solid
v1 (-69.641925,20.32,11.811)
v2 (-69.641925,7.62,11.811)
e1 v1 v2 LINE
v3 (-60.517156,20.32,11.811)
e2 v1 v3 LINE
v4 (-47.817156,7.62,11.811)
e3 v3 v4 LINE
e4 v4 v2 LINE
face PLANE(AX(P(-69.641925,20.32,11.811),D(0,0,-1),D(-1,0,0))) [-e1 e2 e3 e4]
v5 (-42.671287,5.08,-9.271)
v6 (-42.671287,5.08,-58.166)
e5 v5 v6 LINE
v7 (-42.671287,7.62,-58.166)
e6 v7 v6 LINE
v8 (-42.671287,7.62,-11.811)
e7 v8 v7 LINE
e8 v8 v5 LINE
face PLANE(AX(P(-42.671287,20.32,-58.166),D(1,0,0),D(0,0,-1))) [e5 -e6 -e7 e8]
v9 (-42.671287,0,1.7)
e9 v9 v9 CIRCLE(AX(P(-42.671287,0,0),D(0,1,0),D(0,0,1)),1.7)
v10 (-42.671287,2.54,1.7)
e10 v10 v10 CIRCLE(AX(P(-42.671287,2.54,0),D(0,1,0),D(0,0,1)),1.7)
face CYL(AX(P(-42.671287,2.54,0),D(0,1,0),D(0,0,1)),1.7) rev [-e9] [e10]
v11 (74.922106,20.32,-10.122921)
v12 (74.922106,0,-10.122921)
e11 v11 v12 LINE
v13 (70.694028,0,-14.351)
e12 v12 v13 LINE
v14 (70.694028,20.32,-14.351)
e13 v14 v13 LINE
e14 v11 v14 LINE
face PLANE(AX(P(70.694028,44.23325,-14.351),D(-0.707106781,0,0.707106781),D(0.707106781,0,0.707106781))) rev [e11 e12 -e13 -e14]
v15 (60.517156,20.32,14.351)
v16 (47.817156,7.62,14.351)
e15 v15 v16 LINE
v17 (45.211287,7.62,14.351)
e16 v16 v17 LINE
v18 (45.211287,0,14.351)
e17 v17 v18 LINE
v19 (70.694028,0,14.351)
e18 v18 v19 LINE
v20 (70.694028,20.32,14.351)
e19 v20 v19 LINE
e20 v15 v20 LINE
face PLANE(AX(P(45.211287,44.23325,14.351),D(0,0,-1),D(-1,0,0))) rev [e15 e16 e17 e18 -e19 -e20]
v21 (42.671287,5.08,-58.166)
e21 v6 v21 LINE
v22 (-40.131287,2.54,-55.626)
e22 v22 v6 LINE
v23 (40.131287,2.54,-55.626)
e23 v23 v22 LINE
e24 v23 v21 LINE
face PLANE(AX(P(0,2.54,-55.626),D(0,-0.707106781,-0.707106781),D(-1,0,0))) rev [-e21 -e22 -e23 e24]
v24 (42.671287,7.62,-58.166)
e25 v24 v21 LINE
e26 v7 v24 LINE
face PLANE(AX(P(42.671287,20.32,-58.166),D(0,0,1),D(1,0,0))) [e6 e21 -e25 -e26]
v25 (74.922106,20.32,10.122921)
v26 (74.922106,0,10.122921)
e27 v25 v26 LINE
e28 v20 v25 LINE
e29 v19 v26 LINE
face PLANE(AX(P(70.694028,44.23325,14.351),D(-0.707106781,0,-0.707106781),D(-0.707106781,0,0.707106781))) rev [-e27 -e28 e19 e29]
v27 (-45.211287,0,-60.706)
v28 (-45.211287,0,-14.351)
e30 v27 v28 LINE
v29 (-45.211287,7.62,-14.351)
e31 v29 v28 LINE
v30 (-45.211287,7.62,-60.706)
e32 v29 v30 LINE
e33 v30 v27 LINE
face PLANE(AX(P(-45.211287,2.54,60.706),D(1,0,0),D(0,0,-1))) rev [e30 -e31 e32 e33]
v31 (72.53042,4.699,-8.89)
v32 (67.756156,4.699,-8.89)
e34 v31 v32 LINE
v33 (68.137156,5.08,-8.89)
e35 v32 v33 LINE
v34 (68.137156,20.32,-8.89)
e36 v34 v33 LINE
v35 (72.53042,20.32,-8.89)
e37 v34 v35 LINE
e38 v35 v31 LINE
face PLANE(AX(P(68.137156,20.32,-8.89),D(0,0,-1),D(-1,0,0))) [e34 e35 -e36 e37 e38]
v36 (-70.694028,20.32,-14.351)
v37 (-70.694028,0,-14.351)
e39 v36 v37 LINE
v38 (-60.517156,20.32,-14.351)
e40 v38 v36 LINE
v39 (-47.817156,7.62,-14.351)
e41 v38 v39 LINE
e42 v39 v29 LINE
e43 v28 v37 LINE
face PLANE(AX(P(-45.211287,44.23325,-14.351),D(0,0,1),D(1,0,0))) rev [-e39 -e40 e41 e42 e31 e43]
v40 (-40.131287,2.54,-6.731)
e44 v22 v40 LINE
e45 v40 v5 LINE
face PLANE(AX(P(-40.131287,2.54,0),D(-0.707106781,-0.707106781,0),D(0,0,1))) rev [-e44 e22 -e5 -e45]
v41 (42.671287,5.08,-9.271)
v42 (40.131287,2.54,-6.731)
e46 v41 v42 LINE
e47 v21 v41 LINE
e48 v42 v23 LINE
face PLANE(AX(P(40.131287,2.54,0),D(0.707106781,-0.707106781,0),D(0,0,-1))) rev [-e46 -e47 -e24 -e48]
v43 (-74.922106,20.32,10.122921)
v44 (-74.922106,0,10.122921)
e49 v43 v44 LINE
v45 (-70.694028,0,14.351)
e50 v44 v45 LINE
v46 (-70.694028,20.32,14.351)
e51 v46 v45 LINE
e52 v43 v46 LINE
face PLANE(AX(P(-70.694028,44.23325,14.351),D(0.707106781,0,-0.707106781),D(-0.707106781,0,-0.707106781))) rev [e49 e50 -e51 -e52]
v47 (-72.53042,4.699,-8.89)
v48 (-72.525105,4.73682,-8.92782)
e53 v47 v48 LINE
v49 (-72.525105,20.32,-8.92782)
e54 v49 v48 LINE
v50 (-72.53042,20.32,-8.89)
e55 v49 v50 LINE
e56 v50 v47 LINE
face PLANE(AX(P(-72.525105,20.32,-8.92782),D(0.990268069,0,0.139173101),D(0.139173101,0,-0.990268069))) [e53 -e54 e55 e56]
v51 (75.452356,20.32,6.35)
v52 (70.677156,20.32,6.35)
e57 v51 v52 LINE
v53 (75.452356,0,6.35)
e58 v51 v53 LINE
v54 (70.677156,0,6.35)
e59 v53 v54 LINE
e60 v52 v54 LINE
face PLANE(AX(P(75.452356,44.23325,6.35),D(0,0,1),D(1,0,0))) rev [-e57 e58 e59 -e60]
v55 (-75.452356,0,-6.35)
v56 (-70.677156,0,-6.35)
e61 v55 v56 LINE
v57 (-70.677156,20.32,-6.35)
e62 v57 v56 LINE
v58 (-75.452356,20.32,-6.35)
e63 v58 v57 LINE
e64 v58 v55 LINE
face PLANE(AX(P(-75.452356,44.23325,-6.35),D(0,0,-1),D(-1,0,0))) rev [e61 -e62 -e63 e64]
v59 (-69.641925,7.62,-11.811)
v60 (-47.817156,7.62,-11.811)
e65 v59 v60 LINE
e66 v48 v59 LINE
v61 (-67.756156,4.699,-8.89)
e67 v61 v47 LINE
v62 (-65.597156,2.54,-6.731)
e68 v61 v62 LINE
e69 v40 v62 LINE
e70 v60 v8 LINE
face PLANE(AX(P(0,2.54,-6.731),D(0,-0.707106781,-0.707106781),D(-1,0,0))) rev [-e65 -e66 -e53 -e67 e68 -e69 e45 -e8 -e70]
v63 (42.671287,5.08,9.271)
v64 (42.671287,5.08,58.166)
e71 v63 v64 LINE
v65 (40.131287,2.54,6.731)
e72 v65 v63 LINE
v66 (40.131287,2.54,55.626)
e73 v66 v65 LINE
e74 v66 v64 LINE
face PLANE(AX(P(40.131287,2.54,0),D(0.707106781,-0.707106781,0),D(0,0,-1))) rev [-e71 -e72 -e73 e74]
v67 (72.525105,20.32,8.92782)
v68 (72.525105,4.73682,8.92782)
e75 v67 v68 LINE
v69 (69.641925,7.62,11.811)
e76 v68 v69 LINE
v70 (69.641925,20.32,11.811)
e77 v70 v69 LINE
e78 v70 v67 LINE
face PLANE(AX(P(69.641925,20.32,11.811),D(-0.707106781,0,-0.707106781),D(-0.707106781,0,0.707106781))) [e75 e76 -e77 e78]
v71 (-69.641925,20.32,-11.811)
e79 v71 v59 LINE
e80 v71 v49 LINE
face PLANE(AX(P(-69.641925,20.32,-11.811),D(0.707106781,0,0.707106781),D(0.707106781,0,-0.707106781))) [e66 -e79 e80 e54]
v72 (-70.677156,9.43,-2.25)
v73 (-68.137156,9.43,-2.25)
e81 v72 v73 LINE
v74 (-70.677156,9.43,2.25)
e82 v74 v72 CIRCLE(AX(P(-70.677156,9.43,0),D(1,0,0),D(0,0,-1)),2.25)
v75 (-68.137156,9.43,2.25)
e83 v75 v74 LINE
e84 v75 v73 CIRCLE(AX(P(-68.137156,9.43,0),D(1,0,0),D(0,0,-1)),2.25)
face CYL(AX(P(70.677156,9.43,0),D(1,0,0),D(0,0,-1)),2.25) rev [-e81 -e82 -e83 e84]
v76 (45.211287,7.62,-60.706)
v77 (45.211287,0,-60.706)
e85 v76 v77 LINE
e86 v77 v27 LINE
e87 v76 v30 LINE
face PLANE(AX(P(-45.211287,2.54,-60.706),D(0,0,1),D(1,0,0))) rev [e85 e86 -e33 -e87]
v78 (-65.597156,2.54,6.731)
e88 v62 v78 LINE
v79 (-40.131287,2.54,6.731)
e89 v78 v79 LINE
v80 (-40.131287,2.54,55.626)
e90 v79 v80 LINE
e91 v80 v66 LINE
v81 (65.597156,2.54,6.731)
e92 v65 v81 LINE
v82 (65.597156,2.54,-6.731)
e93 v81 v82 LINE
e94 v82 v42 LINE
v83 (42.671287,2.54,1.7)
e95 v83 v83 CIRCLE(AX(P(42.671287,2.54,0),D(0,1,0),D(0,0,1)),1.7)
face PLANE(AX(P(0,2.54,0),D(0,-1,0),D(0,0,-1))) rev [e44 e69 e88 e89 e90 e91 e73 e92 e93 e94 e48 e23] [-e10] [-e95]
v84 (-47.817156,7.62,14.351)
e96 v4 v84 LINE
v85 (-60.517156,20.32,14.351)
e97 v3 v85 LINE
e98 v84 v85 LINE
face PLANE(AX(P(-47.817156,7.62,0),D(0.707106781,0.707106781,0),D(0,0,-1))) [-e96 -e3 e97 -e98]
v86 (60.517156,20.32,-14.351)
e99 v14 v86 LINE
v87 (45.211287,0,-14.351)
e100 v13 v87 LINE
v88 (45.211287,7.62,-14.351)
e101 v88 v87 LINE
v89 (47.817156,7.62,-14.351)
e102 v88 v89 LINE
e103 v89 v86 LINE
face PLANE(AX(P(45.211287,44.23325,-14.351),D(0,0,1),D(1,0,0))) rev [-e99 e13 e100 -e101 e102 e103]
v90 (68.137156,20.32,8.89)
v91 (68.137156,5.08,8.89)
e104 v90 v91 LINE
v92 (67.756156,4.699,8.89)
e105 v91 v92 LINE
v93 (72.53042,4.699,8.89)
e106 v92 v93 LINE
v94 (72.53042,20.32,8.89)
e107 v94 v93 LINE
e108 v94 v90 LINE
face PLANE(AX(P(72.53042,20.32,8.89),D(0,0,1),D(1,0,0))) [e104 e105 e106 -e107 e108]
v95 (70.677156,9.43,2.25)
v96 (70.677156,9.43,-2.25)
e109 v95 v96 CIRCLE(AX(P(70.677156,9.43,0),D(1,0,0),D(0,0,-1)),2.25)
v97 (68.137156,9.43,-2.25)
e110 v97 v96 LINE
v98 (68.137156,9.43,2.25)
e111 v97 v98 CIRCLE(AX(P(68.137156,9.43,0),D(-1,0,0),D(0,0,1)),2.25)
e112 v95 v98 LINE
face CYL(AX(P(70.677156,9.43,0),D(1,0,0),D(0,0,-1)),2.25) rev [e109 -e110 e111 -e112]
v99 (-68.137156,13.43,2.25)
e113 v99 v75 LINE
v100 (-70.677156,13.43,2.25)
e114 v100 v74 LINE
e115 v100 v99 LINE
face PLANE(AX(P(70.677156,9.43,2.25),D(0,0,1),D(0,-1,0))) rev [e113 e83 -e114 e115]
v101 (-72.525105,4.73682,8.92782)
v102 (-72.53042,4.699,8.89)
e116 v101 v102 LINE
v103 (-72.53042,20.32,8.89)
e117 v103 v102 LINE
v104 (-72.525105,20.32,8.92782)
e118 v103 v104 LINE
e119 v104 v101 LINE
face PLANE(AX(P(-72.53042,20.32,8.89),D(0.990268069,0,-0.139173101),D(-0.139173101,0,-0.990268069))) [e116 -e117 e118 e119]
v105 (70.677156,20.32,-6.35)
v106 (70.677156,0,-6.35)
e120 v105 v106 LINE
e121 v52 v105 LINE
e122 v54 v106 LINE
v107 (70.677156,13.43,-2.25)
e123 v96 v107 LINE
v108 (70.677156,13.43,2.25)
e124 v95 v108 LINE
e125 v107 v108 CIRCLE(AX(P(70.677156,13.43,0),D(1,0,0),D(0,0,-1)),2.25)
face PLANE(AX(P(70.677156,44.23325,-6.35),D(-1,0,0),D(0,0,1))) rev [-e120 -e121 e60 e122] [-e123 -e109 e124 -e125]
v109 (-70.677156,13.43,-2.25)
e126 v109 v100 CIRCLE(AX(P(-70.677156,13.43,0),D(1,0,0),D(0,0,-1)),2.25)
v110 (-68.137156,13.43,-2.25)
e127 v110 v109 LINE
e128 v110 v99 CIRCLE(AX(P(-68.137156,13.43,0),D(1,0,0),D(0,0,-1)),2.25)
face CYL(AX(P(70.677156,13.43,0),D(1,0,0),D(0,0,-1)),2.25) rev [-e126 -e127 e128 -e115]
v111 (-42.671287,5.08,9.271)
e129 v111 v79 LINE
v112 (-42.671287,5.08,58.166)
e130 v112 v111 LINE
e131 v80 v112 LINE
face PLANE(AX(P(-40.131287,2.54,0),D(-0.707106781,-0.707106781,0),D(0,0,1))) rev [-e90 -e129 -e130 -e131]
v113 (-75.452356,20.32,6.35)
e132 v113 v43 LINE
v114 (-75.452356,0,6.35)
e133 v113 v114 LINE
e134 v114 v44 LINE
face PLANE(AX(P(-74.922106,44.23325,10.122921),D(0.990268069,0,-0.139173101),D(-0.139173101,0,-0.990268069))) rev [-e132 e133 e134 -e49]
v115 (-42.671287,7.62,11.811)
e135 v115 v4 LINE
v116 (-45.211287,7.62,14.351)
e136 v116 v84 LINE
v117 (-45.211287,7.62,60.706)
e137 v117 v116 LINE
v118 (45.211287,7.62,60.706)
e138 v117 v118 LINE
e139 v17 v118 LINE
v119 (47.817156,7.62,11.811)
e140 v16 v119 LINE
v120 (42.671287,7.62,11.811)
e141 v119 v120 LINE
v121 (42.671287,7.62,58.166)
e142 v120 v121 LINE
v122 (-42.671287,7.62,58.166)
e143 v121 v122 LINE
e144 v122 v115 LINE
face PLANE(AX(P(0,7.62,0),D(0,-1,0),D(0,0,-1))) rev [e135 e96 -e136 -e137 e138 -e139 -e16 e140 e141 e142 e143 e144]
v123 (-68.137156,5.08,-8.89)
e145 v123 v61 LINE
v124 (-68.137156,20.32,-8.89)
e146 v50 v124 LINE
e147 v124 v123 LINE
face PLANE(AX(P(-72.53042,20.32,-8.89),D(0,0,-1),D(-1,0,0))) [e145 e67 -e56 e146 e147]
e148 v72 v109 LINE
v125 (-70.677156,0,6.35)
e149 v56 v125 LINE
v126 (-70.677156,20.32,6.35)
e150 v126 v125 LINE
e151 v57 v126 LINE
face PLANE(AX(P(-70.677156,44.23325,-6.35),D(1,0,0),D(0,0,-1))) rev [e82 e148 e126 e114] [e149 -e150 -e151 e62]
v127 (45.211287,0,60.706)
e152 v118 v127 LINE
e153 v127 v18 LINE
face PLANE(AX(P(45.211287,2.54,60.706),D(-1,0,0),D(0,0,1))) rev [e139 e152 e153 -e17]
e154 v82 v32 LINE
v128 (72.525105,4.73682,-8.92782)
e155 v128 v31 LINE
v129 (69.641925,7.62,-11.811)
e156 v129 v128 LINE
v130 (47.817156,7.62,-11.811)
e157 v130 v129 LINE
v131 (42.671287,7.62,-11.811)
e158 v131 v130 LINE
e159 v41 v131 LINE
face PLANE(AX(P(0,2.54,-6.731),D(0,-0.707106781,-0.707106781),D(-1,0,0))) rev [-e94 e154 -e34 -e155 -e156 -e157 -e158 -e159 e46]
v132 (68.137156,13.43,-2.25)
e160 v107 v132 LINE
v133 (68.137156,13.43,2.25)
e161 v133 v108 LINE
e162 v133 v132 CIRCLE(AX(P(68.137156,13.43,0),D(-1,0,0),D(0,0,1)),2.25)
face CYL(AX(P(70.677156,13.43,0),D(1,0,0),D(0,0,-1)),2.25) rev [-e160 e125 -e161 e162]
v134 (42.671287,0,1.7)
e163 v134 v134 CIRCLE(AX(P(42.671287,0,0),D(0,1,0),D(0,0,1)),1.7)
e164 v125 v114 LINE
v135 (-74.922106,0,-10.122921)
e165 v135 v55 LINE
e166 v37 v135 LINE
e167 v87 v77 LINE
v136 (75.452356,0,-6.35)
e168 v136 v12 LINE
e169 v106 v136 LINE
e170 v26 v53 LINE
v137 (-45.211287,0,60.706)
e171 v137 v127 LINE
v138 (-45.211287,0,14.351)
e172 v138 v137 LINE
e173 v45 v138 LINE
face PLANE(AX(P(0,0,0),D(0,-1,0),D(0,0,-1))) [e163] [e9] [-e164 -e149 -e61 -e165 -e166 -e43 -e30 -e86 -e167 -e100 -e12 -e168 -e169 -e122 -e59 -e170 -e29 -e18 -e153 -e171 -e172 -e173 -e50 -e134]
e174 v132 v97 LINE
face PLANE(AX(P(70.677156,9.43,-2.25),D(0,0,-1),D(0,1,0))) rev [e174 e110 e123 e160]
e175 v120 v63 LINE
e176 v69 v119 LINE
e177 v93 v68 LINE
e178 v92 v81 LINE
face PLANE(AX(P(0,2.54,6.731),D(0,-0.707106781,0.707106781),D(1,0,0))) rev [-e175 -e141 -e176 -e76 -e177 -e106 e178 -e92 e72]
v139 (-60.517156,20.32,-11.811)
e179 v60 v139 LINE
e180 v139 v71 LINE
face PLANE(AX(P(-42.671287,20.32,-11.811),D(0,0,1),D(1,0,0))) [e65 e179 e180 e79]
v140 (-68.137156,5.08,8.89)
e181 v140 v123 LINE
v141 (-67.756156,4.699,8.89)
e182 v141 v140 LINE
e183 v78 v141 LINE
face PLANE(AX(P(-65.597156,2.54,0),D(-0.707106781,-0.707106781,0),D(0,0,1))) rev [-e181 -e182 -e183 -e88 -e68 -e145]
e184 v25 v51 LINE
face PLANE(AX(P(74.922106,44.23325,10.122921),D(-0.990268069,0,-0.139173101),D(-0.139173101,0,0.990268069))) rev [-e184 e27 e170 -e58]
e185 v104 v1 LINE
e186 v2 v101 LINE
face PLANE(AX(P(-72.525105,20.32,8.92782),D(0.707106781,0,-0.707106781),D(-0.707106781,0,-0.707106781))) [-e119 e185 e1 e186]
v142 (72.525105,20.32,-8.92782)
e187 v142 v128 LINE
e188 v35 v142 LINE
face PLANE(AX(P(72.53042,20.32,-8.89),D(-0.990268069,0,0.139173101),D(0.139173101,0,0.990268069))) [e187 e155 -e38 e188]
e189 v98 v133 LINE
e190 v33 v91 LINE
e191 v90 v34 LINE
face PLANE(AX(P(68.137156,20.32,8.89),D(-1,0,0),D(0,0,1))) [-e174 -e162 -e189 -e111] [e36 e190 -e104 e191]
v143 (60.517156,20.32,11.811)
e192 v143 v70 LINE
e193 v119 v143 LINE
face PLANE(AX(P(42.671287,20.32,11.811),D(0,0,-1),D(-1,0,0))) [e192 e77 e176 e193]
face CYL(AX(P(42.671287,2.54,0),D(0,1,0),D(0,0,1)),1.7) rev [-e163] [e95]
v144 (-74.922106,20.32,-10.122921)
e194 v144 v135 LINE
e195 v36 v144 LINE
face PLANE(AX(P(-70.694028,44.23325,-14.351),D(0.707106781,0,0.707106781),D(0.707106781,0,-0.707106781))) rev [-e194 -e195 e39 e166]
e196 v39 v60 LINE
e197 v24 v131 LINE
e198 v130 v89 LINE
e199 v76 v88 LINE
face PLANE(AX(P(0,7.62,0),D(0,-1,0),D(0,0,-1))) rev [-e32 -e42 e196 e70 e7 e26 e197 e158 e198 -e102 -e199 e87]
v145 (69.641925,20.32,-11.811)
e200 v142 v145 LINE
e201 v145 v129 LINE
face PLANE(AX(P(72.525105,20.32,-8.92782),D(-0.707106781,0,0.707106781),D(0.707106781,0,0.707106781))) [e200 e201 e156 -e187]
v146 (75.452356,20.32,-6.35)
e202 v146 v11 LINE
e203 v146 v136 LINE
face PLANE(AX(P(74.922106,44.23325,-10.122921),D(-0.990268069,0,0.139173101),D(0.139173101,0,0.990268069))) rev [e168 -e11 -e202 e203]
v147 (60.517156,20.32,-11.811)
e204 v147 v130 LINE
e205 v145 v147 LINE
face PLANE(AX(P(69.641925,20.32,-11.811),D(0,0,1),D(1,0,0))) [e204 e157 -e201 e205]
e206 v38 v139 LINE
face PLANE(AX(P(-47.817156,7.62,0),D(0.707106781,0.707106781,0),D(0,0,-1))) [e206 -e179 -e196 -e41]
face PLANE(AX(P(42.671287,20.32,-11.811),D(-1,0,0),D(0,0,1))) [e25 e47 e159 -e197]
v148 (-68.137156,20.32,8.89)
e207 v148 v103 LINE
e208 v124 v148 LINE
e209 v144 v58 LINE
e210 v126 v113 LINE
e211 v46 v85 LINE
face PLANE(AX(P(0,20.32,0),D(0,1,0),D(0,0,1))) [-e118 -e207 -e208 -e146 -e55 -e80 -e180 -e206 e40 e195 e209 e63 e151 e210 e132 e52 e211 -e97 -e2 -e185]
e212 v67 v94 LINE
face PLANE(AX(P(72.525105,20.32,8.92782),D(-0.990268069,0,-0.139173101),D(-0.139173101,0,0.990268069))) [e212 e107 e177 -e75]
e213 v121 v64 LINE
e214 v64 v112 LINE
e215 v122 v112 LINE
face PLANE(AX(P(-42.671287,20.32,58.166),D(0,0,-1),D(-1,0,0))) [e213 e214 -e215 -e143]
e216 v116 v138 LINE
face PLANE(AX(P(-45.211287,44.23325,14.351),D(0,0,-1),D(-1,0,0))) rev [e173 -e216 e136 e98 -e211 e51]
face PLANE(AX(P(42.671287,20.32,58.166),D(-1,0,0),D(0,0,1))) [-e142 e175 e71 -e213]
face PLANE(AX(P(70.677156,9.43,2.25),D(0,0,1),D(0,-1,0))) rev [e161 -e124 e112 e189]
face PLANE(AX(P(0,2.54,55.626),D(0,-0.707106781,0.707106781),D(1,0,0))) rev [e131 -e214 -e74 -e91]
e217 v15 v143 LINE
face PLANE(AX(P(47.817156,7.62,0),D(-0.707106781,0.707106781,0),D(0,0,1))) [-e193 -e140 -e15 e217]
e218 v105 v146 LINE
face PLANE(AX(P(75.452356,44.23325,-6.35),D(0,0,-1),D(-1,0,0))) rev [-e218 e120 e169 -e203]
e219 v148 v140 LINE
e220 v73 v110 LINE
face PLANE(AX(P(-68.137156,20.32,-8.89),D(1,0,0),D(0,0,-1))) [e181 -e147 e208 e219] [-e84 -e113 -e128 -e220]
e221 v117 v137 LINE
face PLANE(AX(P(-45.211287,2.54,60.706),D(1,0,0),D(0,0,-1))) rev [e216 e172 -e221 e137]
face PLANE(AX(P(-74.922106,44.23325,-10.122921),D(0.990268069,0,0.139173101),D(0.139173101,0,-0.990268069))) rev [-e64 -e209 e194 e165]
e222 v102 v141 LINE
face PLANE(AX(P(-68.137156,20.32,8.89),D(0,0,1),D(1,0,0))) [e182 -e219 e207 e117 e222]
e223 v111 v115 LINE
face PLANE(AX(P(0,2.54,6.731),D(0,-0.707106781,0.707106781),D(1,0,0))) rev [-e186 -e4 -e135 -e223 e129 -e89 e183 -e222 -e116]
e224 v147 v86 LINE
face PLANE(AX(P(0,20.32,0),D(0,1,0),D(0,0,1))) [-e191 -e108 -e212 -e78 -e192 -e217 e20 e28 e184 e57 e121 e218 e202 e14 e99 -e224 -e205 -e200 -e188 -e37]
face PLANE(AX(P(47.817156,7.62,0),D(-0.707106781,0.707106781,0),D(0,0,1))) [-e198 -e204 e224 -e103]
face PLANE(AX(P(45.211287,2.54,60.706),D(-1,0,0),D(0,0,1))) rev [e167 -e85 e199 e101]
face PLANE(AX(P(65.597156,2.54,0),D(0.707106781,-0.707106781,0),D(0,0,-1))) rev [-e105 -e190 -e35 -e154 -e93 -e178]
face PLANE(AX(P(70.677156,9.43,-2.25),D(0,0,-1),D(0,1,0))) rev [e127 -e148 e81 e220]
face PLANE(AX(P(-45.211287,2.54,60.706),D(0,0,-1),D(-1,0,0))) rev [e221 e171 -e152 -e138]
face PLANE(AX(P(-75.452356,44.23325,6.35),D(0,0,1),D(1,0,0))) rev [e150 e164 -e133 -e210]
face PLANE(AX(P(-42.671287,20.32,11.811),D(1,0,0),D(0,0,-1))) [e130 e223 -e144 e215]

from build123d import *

# Parameters (mm, degrees)
SKETCH4_W                = 90.422573022
SKETCH4_H                = 121.412
BOSS_EXTRUDE2_DEPTH      = 2.54
BOSS_EXTRUDE3_DEPTH      = 2.54
BOSS_EXTRUDE4_DEPTH      = 17.78
SKETCH7_W                = 121.034311438
SKETCH7_H                = 121.412
CUT_EXTRUDE1_DEPTH       = 12.7
CHAMFER1_SIZE            = 12.7
CHAMFER3_SIZE            = 5.08
CHAMFER4_SIZE            = 2.54
M4_START                 = -70.677155719
M4_CLEARANCE_SLOT1_DEPTH = 141.354311438
M3_CLEARANCE_HOLE1_D     = 3.4


# Read off the part's stored shape, not the designer's step: M4 Clearance Slot1
with BuildPart() as part:
    # Sketch4 → Boss-Extrude2 (new body)
    with BuildSketch(Plane(origin=(0, 0, 0), x_dir=(1, 0, 0), z_dir=(0, 1, 0))):
        Rectangle(SKETCH4_W, SKETCH4_H)
    extrude(amount=BOSS_EXTRUDE2_DEPTH)

    # Sketch5 → Boss-Extrude3 (add)
    with BuildSketch(Plane(origin=(0, 0, 0), x_dir=(1, 0, 0), z_dir=(0, 1, 0))):
        Polygon((45.211286511, 14.351), (70.694027546, 14.351), (74.922106204, 10.122921342), (75.452355719, 6.35), (70.677155719, 6.35), (70.677155719, -6.35), (75.452355719, -6.35), (74.922106204, -10.122921342), (70.694027546, -14.351), (45.211286511, -14.351), align=None)
        Polygon((-45.211286511, 14.351), (-45.211286511, -14.351), (-70.694027546, -14.351), (-74.922106204, -10.122921342), (-75.452355719, -6.35), (-70.677155719, -6.35), (-70.677155719, 6.35), (-75.452355719, 6.35), (-74.922106204, 10.122921342), (-70.694027546, 14.351), align=None)
    extrude(amount=BOSS_EXTRUDE3_DEPTH)

    # Sketch6 → Boss-Extrude4 (add)
    with BuildSketch(Plane(origin=(0, 2.54, 0), x_dir=(1, 0, 0), z_dir=(0, 1, 0))):
        Polygon((45.211286511, -60.706), (45.211286511, -14.351), (70.694027546, -14.351), (74.922106204, -10.122921342), (75.452355719, -6.35), (70.677155719, -6.35), (70.677155719, 6.35), (75.452355719, 6.35), (74.922106204, 10.122921342), (70.694027546, 14.351), (45.211286511, 14.351), (45.211286511, 60.706), (-45.211286511, 60.706), (-45.211286511, 14.351), (-70.694027546, 14.351), (-74.922106204, 10.122921342), (-75.452355719, 6.35), (-70.677155719, 6.35), (-70.677155719, -6.35), (-75.452355719, -6.35), (-74.922106204, -10.122921342), (-70.694027546, -14.351), (-45.211286511, -14.351), (-45.211286511, -60.706), align=None)
        Polygon((42.671286511, -58.166), (42.671286511, -11.811), (69.641925098, -11.811), (72.525104647, -8.927820451), (72.530419964, -8.89), (68.137155719, -8.89), (68.137155719, 8.89), (72.530419964, 8.89), (72.525104647, 8.927820451), (69.641925098, 11.811), (42.671286511, 11.811), (42.671286511, 58.166), (-42.671286511, 58.166), (-42.671286511, 11.811), (-69.641925098, 11.811), (-72.525104647, 8.927820451), (-72.530419964, 8.89), (-68.137155719, 8.89), (-68.137155719, -8.89), (-72.530419964, -8.89), (-72.525104647, -8.927820451), (-69.641925098, -11.811), (-42.671286511, -11.811), (-42.671286511, -58.166), align=None, mode=Mode.SUBTRACT)
    extrude(amount=BOSS_EXTRUDE4_DEPTH)

    # Sketch7 → Cut-Extrude1 (cut)
    with BuildSketch(Plane(origin=(0, 20.32, 0), x_dir=(1, 0, 0), z_dir=(0, 1, 0))):
        Rectangle(SKETCH7_W, SKETCH7_H)
    extrude(amount=-CUT_EXTRUDE1_DEPTH, mode=Mode.SUBTRACT)

    # Chamfer1
    chamfer1_edges = [part.edges().sort_by_distance(p)[0] for p in [
        (-60.517155719, 7.62, -13.081),
        (-60.517155719, 7.62, 13.081),
        (60.517155719, 7.62, 13.081),
        (60.517155719, 7.62, -13.081),
    ]]
    chamfer(chamfer1_edges, length=CHAMFER1_SIZE - 0.0001)  # a hair under: the kernel refuses the full size

    # Chamfer3
    chamfer3_edges = [part.edges().sort_by_distance(p)[0] for p in [
        (-56.156605804, 2.54, 11.811),
        (-56.156605804, 2.54, -11.811),
        (56.156605804, 2.54, 11.811),
        (56.156605804, 2.54, -11.811),
    ]]
    chamfer(chamfer3_edges, length=CHAMFER3_SIZE - 0.0001)  # a hair under: the kernel refuses the full size

    # Chamfer4
    chamfer4_edges = [part.edges().sort_by_distance(p)[0] for p in [
        (42.671286511, 2.54, 32.44855),
        (0, 2.54, 58.166),
        (-42.671286511, 2.54, 32.44855),
        (-42.671286511, 2.54, -32.44855),
        (42.671286511, 2.54, -32.44855),
        (0, 2.54, -58.166),
        (-68.137155719, 2.54, 0),
        (68.137155719, 2.54, 0),
    ]]
    chamfer(chamfer4_edges, length=CHAMFER4_SIZE)

    # M4 Clearance Slot1 outline → M4 Clearance Slot1 (cut)
    with BuildSketch(Plane.YZ.offset(M4_START)):
        with BuildLine():
            Line((9.43, -2.25), (13.43, -2.25))
            ThreePointArc((13.43, -2.25), (15.68, 0), (13.43, 2.25))
            Line((13.43, 2.25), (9.43, 2.25))
            ThreePointArc((9.43, 2.25), (7.18, 0), (9.43, -2.25))
        make_face()
    extrude(amount=M4_CLEARANCE_SLOT1_DEPTH, mode=Mode.SUBTRACT)

    # M3 Clearance Hole1 (through all)
    with Locations(Plane(origin=(0, 2.54, 0), x_dir=(1, 0, 0), z_dir=(0, 1, 0))):
        with Locations((42.671286511, 0), (-42.671286511, 0)):
            Hole(M3_CLEARANCE_HOLE1_D / 2)


solid = part.part
